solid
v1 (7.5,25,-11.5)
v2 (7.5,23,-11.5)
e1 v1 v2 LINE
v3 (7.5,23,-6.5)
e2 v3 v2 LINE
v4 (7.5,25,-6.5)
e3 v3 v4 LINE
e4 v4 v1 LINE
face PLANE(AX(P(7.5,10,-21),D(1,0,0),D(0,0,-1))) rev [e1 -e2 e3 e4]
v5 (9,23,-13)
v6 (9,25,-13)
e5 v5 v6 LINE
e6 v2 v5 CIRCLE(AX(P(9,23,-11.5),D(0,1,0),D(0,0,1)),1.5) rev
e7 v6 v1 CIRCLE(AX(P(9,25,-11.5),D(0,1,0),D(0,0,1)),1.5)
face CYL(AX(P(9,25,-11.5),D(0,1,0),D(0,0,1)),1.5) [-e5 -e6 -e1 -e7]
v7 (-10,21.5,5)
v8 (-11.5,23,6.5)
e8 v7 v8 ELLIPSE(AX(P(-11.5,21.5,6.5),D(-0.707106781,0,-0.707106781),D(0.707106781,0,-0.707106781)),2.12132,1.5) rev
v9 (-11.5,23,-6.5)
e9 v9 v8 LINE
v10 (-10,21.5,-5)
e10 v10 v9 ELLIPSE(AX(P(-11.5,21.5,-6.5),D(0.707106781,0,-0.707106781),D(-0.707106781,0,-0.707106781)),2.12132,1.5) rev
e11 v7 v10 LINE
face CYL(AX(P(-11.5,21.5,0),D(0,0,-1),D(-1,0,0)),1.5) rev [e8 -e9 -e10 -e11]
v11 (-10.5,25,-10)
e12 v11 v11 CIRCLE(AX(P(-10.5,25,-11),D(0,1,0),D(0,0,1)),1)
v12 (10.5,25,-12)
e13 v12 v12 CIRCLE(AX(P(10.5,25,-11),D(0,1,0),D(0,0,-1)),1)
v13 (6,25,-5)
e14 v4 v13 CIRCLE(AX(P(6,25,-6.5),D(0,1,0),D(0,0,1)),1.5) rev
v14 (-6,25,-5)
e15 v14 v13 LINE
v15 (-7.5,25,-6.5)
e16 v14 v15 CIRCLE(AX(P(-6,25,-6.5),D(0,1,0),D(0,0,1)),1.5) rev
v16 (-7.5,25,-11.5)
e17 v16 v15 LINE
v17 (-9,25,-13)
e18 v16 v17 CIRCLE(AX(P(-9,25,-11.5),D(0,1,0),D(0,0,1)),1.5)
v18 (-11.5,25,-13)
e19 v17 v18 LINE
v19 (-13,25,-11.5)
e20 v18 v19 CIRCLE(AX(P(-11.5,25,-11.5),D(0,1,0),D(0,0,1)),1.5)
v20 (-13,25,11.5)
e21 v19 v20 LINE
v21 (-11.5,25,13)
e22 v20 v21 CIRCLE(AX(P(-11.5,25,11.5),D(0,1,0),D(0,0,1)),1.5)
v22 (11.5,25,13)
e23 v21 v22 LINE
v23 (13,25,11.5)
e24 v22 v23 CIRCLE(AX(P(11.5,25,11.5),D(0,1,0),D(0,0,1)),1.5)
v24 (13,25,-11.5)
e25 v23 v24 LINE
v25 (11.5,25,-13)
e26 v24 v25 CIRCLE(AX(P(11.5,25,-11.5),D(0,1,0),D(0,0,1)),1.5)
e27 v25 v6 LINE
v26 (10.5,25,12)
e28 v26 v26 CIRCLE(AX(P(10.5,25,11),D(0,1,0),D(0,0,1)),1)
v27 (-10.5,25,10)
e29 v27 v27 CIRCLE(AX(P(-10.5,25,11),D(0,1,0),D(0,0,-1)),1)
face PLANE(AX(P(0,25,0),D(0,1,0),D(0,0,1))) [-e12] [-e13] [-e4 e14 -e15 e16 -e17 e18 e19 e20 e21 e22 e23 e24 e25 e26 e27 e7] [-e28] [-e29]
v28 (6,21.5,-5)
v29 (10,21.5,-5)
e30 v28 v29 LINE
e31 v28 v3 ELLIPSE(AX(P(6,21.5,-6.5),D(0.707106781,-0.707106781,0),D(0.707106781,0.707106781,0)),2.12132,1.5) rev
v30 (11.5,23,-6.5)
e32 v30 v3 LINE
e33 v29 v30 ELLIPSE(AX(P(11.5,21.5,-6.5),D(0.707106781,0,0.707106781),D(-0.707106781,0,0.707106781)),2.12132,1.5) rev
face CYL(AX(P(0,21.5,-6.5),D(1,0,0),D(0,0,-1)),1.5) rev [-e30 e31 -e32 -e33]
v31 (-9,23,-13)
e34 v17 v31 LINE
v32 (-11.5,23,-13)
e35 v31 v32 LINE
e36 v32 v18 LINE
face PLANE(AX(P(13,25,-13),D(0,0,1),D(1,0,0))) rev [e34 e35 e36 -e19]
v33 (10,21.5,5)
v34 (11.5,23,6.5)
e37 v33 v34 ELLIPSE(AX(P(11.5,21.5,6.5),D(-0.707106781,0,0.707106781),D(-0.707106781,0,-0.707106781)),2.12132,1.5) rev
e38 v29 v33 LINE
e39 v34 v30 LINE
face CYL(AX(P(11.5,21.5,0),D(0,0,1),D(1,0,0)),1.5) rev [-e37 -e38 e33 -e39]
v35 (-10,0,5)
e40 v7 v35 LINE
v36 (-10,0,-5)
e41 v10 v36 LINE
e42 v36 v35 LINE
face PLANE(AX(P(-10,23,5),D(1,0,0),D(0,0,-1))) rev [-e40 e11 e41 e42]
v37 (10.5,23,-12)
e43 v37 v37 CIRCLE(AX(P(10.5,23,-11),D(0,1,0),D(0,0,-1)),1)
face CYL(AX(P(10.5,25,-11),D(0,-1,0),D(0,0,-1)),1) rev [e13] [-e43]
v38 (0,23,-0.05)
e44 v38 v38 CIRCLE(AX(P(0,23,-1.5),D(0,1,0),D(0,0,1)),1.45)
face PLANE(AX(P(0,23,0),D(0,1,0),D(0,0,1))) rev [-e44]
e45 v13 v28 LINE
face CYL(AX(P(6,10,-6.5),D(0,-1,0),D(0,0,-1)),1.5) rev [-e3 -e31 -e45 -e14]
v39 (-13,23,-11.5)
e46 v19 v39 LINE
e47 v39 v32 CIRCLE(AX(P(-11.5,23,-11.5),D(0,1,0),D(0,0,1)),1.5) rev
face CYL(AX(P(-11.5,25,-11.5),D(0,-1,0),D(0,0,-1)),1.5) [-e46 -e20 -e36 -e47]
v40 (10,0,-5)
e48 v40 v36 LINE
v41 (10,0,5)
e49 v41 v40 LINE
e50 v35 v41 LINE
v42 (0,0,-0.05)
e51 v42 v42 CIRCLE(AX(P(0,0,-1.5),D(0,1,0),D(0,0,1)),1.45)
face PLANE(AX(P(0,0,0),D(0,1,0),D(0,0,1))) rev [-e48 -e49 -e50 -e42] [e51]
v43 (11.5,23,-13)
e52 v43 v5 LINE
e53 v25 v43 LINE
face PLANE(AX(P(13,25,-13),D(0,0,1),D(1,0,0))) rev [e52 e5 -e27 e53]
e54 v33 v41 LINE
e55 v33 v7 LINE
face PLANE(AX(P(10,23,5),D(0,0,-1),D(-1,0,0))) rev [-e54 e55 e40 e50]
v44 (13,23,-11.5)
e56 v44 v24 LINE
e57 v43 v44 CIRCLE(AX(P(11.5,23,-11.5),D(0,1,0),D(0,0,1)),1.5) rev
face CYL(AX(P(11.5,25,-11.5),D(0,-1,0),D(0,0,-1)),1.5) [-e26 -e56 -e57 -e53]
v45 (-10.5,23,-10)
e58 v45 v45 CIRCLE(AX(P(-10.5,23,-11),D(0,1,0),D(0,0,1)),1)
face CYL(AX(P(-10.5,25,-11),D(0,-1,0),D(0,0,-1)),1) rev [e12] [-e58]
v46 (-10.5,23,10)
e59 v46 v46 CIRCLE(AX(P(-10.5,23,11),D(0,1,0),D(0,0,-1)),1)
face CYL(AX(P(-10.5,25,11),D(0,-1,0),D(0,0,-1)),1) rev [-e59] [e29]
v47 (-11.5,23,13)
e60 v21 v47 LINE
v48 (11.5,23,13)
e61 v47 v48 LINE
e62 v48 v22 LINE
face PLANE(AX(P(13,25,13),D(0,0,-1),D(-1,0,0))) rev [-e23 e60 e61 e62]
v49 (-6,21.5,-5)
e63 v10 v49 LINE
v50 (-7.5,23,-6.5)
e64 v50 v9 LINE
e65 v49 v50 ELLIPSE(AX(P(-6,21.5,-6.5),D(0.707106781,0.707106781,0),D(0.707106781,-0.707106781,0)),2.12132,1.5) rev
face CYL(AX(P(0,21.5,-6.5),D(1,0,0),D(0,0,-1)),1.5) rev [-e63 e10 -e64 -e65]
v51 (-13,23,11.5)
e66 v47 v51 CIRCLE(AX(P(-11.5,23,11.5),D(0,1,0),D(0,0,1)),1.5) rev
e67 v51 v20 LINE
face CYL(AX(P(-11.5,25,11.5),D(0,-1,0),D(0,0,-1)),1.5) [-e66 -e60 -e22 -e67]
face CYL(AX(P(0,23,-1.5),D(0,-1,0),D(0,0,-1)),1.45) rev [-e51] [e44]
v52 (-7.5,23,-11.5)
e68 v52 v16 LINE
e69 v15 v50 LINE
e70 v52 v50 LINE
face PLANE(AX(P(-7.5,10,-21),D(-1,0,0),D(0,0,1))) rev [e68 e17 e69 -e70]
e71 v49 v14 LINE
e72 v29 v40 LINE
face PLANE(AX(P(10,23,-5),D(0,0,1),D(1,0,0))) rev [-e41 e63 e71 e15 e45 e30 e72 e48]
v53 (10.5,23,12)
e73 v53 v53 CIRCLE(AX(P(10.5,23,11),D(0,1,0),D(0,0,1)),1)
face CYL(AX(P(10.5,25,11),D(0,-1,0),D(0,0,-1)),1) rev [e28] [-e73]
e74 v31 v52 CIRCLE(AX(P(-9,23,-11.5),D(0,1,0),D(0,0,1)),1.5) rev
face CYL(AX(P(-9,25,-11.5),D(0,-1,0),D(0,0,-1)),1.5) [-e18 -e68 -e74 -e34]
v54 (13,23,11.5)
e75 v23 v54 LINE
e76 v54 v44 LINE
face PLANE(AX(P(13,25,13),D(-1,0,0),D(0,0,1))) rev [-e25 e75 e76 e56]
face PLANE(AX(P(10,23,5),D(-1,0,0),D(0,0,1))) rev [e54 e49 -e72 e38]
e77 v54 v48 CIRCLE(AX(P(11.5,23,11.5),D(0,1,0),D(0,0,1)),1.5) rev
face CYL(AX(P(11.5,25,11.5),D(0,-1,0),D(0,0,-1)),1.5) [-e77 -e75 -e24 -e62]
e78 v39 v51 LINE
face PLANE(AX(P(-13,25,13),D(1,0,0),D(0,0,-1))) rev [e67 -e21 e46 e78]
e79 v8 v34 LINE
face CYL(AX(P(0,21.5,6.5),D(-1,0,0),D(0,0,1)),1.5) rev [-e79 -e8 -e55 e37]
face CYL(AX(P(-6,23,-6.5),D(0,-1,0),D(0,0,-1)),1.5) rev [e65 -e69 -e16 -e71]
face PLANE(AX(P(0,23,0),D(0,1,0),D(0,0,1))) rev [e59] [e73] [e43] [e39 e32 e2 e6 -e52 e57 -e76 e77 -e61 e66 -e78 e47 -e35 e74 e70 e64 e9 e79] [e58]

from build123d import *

# Parameters (mm, degrees)
SKETCH_1_W          = 20
SKETCH_1_H          = 10
SKETCH_1_R          = 1.45
EXTRUDE_1_DEPTH     = 23
SKETCH_2_R          = 1
EXTRUDE_2_DEPTH     = 2
SKETCH_3_W          = 15
SKETCH_3_H          = 16
CUT_EXTRUDE_1_DEPTH = 15
FILLET_3_R          = 1.5


with BuildPart() as part:
    # 草图1 → 凸台-拉伸1 (new body)
    with BuildSketch(Plane(origin=(0, 0, 0), x_dir=(1, 0, 0), z_dir=(0, 1, 0))):
        Rectangle(SKETCH_1_W, SKETCH_1_H)
        with Locations(Location((0, 1.5, 0), (0, 0, 270))):
            Circle(SKETCH_1_R, mode=Mode.SUBTRACT)
    extrude(amount=EXTRUDE_1_DEPTH)

    # 草图2 → 凸台-拉伸2 (add)
    with BuildSketch(Plane(origin=(0, 23, 0), x_dir=(1, 0, 0), z_dir=(0, 1, 0))):
        Polygon((13, -13), (0, -13), (-13, -13), (-13, 13), (13, 13), align=None)
        with Locations(Location((-10.5, 11, 0), (0, 0, 270))):
            Circle(SKETCH_2_R, mode=Mode.SUBTRACT)
        with Locations(Location((10.5, 11, 0), (0, 0, 90))):
            Circle(SKETCH_2_R, mode=Mode.SUBTRACT)
        with Locations(Location((10.5, -11, 0), (0, 0, 270))):
            Circle(SKETCH_2_R, mode=Mode.SUBTRACT)
        with Locations(Location((-10.5, -11, 0), (0, 0, 90))):
            Circle(SKETCH_2_R, mode=Mode.SUBTRACT)
    extrude(amount=EXTRUDE_2_DEPTH)

    # 草图3 → 切除-拉伸1 (cut)
    with BuildSketch(Plane(origin=(0, 25, 0), x_dir=(1, 0, 0), z_dir=(0, 1, 0))):
        with Locations((0, 13)):
            Rectangle(SKETCH_3_W, SKETCH_3_H)
    extrude(amount=-CUT_EXTRUDE_1_DEPTH, mode=Mode.SUBTRACT)

    # 圆角3
    fillet_3_edges = [part.edges().sort_by_distance(p)[0] for p in [
        (10, 23, 0),
        (8.75, 23, -5),
        (-13, 24, -13),
        (-13, 24, 13),
        (13, 24, 13),
        (13, 24, -13),
        (7.5, 24, -13),
        (-7.5, 24, -13),
        (-8.75, 23, -5),
        (7.5, 24, -5),
        (-7.5, 24, -5),
        (-10, 23, 0),
        (0, 23, 5),
    ]]
    fillet(fillet_3_edges, radius=FILLET_3_R - 0.0001)  # a hair under: the kernel refuses the full size


solid = part.part
